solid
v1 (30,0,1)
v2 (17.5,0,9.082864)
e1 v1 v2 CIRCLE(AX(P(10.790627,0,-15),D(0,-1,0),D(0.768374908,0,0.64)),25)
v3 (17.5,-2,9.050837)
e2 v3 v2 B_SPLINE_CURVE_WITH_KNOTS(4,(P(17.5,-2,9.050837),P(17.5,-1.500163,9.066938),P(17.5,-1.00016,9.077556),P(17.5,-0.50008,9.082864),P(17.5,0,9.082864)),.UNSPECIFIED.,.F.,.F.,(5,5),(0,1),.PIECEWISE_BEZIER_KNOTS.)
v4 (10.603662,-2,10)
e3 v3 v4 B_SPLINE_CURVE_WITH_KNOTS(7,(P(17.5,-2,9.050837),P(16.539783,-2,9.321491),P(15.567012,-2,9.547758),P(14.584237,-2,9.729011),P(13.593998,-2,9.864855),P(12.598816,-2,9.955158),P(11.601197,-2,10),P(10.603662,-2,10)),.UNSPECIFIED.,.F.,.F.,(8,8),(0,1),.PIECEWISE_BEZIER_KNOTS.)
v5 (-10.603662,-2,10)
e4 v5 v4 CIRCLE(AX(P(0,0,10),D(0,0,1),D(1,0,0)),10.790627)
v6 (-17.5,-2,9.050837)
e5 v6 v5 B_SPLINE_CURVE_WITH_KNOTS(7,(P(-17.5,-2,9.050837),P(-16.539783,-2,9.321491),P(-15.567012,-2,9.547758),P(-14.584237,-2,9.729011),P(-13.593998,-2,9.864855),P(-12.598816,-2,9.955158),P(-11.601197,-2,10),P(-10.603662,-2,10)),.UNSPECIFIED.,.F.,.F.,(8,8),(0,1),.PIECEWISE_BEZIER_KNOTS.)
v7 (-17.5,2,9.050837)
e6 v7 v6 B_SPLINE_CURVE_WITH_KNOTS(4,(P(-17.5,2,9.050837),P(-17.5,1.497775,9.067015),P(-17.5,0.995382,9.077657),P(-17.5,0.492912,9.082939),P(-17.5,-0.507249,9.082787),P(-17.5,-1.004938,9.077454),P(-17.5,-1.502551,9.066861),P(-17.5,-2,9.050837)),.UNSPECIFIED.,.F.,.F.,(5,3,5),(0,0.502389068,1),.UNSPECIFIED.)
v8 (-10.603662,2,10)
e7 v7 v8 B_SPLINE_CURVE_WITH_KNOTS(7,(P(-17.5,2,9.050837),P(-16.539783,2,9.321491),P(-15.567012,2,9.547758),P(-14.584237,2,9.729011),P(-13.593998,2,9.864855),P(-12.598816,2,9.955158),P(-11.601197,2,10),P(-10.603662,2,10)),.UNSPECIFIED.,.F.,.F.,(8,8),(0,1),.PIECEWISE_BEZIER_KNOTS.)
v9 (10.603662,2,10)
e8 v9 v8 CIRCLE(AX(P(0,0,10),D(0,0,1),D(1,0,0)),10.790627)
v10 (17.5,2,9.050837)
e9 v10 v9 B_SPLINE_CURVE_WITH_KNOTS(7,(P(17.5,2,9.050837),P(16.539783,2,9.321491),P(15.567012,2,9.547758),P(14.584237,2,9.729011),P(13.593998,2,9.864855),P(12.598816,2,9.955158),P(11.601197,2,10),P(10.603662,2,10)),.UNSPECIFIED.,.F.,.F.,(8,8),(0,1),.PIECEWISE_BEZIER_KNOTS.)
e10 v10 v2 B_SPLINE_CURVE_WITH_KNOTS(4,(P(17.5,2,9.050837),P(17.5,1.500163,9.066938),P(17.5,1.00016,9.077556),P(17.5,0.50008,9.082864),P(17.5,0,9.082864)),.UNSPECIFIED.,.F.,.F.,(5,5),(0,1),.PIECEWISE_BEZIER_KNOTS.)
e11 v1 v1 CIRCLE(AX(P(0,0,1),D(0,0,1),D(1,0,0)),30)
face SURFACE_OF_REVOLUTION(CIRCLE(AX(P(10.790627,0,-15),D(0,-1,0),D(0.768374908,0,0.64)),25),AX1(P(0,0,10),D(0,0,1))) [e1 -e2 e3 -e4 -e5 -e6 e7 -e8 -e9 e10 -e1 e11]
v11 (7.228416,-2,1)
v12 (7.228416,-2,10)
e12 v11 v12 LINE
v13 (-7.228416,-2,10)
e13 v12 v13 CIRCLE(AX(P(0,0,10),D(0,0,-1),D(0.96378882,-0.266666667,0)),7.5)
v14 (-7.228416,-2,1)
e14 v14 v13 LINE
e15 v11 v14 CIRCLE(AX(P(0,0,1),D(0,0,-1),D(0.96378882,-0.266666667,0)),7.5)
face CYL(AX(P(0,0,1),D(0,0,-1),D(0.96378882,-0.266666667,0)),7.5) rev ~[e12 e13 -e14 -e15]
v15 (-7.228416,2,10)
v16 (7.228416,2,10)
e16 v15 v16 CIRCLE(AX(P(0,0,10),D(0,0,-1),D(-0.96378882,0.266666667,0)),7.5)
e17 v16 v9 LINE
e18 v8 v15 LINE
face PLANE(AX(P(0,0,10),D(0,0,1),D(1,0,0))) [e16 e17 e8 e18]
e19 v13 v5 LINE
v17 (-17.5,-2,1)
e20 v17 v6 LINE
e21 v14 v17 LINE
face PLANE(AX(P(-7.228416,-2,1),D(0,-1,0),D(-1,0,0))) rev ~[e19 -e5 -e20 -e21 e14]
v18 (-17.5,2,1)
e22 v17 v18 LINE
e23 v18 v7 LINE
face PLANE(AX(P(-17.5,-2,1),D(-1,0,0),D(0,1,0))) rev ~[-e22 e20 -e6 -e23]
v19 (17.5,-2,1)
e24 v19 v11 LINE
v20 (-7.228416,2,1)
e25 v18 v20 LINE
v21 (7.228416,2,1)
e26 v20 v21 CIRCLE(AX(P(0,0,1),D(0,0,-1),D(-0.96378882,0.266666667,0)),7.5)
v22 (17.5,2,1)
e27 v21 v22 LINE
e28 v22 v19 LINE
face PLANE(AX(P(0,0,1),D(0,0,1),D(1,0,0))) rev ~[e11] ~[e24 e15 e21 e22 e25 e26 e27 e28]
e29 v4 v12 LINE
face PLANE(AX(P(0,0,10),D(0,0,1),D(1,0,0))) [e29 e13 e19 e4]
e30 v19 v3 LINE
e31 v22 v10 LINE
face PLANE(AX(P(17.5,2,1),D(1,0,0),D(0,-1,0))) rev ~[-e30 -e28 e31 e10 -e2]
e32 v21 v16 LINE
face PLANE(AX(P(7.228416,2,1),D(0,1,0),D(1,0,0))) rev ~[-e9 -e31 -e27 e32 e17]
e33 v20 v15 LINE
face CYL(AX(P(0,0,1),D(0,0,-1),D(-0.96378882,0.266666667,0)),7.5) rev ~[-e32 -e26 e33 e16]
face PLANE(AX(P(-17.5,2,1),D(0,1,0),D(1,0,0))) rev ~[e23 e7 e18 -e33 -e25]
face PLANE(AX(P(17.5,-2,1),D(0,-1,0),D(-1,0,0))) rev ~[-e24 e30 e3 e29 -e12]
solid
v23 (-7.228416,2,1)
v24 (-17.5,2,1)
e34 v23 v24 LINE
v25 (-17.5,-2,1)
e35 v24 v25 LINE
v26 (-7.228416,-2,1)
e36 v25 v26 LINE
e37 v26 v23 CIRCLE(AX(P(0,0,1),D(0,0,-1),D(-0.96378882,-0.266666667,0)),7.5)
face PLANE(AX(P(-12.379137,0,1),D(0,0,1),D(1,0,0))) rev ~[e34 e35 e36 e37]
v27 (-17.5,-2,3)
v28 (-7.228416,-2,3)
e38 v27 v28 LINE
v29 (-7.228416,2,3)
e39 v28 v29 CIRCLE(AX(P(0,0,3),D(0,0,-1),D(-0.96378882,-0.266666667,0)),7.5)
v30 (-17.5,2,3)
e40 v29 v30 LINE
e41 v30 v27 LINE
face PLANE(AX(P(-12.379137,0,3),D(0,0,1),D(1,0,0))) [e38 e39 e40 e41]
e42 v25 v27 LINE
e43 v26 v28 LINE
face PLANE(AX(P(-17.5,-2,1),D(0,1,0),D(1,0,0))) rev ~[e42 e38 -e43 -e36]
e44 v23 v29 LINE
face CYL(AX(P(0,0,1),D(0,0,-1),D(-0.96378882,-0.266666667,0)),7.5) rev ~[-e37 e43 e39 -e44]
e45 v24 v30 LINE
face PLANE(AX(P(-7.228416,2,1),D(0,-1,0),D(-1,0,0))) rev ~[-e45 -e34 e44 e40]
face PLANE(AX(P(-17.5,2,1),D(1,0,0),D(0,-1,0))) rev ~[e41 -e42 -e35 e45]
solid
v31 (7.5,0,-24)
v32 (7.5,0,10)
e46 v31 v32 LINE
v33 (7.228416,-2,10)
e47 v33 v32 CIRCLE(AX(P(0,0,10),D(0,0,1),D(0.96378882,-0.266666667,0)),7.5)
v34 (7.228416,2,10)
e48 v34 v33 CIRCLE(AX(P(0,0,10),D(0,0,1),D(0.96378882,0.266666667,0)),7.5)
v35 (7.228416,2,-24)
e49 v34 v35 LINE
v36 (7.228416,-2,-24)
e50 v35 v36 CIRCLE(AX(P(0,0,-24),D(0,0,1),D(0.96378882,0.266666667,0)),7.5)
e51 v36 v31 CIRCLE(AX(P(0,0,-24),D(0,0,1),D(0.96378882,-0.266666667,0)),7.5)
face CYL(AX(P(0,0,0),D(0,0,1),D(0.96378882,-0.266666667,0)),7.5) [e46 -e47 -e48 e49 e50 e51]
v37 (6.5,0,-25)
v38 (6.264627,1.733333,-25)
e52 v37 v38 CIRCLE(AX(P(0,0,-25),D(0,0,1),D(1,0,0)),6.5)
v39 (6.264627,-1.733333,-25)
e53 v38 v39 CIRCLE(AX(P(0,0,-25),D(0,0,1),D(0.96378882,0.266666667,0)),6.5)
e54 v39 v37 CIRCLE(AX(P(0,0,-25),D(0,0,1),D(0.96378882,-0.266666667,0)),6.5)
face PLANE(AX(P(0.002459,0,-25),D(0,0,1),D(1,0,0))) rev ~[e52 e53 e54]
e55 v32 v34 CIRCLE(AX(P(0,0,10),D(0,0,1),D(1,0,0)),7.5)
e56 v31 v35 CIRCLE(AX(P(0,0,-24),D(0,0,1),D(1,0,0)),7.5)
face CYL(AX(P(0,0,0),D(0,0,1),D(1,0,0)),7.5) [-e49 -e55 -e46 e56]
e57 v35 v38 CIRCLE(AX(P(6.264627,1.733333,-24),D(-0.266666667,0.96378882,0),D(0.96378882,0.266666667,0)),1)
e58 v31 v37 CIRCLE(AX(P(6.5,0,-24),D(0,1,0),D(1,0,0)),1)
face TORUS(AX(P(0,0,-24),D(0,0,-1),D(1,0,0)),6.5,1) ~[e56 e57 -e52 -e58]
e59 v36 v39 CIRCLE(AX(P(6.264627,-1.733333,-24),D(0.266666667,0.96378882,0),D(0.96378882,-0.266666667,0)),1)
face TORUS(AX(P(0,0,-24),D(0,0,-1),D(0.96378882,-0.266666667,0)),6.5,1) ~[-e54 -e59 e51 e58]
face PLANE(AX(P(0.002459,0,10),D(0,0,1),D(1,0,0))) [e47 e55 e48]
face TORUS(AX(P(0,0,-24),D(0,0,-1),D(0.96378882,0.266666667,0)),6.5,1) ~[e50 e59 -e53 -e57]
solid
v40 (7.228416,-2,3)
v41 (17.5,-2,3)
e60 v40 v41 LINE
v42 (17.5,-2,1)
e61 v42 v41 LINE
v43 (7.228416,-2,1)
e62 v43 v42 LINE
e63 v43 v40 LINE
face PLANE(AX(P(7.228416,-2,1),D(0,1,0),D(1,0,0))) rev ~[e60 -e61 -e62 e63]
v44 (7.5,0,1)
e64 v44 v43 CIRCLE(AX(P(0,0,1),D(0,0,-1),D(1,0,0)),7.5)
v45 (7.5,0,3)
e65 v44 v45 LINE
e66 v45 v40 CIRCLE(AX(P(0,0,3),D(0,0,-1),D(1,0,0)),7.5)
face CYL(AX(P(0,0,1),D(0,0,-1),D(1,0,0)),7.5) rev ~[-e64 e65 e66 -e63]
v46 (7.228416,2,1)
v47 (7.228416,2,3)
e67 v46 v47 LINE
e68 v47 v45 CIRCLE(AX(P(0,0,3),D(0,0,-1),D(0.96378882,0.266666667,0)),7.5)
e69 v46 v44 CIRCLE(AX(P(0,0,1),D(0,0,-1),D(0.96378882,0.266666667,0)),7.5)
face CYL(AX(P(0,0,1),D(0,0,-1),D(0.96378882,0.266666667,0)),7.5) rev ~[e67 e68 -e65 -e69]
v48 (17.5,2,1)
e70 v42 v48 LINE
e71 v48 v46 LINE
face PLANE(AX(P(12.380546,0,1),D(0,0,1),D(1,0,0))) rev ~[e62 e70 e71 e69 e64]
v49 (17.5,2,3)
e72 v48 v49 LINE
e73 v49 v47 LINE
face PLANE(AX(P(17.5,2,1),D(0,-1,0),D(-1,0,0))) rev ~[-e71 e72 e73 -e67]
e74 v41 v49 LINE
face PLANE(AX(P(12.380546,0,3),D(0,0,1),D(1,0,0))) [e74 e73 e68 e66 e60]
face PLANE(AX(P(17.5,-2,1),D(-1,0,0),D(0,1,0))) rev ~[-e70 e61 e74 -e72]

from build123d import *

# Parameters (mm, degrees)
F1_DEPTH      = 10
F1_DEPTH_BACK = 25
F2_START      = 1
F0_R          = 30
F2_DEPTH      = 9
F4_R          = 1
F5_START      = 1
F5_DEPTH      = 2


# Not quite as in the source:
# - a fillet or chamfer that OpenCascade refuses, or shapes differently, is made with other operations: its cross-section is extruded or revolved along the edge and cut away or added


with BuildPart() as f1:
    # F0 (on Top) → F1 (new body, two sides)
    with BuildSketch(Plane.XY) as f1_sk:
        with BuildLine():
            ThreePointArc((7.2284161474, -2), (7.4317938987, -1.0091776094), (7.5, 0))
            ThreePointArc((7.5, 0), (7.4317938987, 1.0091776094), (7.2284161474, 2))
            Line((7.2284161474, 2), (-7.2284161474, 2))
            ThreePointArc((-7.2284161474, 2), (-7.5, 0), (-7.2284161474, -2))
            Line((-7.2284161474, -2), (7.2284161474, -2))
        make_face()
        with BuildLine():
            ThreePointArc((-7.2284161474, -2), (0, -7.5), (7.2284161474, -2))
            Line((7.2284161474, -2), (-7.2284161474, -2))
        make_face()
        with BuildLine():
            Line((-7.2284161474, 2), (7.2284161474, 2))
            ThreePointArc((7.2284161474, 2), (0, 7.5), (-7.2284161474, 2))
        make_face()
    extrude(amount=F1_DEPTH)
    extrude(f1_sk.sketch, amount=-F1_DEPTH_BACK)

    # F4
    f4_edges = [f1.edges().sort_by_distance(p)[0] for p in [
        (-7.228416, -2, -25),
    ]]
    fillet(f4_edges, radius=F4_R)


with BuildPart() as f2:
    # F0 (on Top) → F2 (new body)
    with BuildSketch(Plane.XY.offset(F2_START)):
        Circle(F0_R)
        with BuildLine():
            ThreePointArc((-7.2284161474, 2), (0, 7.5), (7.2284161474, 2))
            Line((7.2284161474, 2), (17.5, 2))
            Line((17.5, 2), (17.5, -2))
            Line((17.5, -2), (7.2284161474, -2))
            ThreePointArc((7.2284161474, -2), (0, -7.5), (-7.2284161474, -2))
            Line((-7.2284161474, -2), (-17.5, -2))
            Line((-17.5, -2), (-17.5, 2))
            Line((-17.5, 2), (-7.2284161474, 2))
        make_face(mode=Mode.SUBTRACT)
    extrude(amount=F2_DEPTH)

    # F3: fillet of radius 25 on 1 edges, made by hand

    # F3_s1 → F3_t2 (revolve, cut)
    with BuildSketch(Plane.XZ):
        with BuildLine():
            ThreePointArc((30, 1), (21.3972290055, 7.6384628453), (10.7906272877, 10))
            Line((10.7906272877, 10), (30, 10))
            Line((30, 10), (30, 1))
        make_face()
    revolve(axis=Axis((0, 0, 10), (0, 0, 1)), mode=Mode.SUBTRACT)


with BuildPart() as f5:
    # F0 (on Top) → F5 (new body)
    with BuildSketch(Plane.XY.offset(F5_START)):
        with BuildLine():
            ThreePointArc((-7.2284161474, -2), (-7.5, 0), (-7.2284161474, 2))
            Line((-7.2284161474, 2), (-17.5, 2))
            Line((-17.5, 2), (-17.5, -2))
            Line((-17.5, -2), (-7.2284161474, -2))
        make_face()
    extrude(amount=F5_DEPTH)


with BuildPart() as f5b:
    # F0 (on Top) → F5, piece 2 (new body)
    with BuildSketch(Plane.XY.offset(F5_START)):
        with BuildLine():
            ThreePointArc((7.2284161474, 2), (7.4317938987, 1.0091776094), (7.5, 0))
            ThreePointArc((7.5, 0), (7.4317938987, -1.0091776094), (7.2284161474, -2))
            Line((7.2284161474, -2), (17.5, -2))
            Line((17.5, -2), (17.5, 2))
            Line((17.5, 2), (7.2284161474, 2))
        make_face()
    extrude(amount=F5_DEPTH)


solid = Compound([f1.part, f2.part, f5.part, f5b.part])
